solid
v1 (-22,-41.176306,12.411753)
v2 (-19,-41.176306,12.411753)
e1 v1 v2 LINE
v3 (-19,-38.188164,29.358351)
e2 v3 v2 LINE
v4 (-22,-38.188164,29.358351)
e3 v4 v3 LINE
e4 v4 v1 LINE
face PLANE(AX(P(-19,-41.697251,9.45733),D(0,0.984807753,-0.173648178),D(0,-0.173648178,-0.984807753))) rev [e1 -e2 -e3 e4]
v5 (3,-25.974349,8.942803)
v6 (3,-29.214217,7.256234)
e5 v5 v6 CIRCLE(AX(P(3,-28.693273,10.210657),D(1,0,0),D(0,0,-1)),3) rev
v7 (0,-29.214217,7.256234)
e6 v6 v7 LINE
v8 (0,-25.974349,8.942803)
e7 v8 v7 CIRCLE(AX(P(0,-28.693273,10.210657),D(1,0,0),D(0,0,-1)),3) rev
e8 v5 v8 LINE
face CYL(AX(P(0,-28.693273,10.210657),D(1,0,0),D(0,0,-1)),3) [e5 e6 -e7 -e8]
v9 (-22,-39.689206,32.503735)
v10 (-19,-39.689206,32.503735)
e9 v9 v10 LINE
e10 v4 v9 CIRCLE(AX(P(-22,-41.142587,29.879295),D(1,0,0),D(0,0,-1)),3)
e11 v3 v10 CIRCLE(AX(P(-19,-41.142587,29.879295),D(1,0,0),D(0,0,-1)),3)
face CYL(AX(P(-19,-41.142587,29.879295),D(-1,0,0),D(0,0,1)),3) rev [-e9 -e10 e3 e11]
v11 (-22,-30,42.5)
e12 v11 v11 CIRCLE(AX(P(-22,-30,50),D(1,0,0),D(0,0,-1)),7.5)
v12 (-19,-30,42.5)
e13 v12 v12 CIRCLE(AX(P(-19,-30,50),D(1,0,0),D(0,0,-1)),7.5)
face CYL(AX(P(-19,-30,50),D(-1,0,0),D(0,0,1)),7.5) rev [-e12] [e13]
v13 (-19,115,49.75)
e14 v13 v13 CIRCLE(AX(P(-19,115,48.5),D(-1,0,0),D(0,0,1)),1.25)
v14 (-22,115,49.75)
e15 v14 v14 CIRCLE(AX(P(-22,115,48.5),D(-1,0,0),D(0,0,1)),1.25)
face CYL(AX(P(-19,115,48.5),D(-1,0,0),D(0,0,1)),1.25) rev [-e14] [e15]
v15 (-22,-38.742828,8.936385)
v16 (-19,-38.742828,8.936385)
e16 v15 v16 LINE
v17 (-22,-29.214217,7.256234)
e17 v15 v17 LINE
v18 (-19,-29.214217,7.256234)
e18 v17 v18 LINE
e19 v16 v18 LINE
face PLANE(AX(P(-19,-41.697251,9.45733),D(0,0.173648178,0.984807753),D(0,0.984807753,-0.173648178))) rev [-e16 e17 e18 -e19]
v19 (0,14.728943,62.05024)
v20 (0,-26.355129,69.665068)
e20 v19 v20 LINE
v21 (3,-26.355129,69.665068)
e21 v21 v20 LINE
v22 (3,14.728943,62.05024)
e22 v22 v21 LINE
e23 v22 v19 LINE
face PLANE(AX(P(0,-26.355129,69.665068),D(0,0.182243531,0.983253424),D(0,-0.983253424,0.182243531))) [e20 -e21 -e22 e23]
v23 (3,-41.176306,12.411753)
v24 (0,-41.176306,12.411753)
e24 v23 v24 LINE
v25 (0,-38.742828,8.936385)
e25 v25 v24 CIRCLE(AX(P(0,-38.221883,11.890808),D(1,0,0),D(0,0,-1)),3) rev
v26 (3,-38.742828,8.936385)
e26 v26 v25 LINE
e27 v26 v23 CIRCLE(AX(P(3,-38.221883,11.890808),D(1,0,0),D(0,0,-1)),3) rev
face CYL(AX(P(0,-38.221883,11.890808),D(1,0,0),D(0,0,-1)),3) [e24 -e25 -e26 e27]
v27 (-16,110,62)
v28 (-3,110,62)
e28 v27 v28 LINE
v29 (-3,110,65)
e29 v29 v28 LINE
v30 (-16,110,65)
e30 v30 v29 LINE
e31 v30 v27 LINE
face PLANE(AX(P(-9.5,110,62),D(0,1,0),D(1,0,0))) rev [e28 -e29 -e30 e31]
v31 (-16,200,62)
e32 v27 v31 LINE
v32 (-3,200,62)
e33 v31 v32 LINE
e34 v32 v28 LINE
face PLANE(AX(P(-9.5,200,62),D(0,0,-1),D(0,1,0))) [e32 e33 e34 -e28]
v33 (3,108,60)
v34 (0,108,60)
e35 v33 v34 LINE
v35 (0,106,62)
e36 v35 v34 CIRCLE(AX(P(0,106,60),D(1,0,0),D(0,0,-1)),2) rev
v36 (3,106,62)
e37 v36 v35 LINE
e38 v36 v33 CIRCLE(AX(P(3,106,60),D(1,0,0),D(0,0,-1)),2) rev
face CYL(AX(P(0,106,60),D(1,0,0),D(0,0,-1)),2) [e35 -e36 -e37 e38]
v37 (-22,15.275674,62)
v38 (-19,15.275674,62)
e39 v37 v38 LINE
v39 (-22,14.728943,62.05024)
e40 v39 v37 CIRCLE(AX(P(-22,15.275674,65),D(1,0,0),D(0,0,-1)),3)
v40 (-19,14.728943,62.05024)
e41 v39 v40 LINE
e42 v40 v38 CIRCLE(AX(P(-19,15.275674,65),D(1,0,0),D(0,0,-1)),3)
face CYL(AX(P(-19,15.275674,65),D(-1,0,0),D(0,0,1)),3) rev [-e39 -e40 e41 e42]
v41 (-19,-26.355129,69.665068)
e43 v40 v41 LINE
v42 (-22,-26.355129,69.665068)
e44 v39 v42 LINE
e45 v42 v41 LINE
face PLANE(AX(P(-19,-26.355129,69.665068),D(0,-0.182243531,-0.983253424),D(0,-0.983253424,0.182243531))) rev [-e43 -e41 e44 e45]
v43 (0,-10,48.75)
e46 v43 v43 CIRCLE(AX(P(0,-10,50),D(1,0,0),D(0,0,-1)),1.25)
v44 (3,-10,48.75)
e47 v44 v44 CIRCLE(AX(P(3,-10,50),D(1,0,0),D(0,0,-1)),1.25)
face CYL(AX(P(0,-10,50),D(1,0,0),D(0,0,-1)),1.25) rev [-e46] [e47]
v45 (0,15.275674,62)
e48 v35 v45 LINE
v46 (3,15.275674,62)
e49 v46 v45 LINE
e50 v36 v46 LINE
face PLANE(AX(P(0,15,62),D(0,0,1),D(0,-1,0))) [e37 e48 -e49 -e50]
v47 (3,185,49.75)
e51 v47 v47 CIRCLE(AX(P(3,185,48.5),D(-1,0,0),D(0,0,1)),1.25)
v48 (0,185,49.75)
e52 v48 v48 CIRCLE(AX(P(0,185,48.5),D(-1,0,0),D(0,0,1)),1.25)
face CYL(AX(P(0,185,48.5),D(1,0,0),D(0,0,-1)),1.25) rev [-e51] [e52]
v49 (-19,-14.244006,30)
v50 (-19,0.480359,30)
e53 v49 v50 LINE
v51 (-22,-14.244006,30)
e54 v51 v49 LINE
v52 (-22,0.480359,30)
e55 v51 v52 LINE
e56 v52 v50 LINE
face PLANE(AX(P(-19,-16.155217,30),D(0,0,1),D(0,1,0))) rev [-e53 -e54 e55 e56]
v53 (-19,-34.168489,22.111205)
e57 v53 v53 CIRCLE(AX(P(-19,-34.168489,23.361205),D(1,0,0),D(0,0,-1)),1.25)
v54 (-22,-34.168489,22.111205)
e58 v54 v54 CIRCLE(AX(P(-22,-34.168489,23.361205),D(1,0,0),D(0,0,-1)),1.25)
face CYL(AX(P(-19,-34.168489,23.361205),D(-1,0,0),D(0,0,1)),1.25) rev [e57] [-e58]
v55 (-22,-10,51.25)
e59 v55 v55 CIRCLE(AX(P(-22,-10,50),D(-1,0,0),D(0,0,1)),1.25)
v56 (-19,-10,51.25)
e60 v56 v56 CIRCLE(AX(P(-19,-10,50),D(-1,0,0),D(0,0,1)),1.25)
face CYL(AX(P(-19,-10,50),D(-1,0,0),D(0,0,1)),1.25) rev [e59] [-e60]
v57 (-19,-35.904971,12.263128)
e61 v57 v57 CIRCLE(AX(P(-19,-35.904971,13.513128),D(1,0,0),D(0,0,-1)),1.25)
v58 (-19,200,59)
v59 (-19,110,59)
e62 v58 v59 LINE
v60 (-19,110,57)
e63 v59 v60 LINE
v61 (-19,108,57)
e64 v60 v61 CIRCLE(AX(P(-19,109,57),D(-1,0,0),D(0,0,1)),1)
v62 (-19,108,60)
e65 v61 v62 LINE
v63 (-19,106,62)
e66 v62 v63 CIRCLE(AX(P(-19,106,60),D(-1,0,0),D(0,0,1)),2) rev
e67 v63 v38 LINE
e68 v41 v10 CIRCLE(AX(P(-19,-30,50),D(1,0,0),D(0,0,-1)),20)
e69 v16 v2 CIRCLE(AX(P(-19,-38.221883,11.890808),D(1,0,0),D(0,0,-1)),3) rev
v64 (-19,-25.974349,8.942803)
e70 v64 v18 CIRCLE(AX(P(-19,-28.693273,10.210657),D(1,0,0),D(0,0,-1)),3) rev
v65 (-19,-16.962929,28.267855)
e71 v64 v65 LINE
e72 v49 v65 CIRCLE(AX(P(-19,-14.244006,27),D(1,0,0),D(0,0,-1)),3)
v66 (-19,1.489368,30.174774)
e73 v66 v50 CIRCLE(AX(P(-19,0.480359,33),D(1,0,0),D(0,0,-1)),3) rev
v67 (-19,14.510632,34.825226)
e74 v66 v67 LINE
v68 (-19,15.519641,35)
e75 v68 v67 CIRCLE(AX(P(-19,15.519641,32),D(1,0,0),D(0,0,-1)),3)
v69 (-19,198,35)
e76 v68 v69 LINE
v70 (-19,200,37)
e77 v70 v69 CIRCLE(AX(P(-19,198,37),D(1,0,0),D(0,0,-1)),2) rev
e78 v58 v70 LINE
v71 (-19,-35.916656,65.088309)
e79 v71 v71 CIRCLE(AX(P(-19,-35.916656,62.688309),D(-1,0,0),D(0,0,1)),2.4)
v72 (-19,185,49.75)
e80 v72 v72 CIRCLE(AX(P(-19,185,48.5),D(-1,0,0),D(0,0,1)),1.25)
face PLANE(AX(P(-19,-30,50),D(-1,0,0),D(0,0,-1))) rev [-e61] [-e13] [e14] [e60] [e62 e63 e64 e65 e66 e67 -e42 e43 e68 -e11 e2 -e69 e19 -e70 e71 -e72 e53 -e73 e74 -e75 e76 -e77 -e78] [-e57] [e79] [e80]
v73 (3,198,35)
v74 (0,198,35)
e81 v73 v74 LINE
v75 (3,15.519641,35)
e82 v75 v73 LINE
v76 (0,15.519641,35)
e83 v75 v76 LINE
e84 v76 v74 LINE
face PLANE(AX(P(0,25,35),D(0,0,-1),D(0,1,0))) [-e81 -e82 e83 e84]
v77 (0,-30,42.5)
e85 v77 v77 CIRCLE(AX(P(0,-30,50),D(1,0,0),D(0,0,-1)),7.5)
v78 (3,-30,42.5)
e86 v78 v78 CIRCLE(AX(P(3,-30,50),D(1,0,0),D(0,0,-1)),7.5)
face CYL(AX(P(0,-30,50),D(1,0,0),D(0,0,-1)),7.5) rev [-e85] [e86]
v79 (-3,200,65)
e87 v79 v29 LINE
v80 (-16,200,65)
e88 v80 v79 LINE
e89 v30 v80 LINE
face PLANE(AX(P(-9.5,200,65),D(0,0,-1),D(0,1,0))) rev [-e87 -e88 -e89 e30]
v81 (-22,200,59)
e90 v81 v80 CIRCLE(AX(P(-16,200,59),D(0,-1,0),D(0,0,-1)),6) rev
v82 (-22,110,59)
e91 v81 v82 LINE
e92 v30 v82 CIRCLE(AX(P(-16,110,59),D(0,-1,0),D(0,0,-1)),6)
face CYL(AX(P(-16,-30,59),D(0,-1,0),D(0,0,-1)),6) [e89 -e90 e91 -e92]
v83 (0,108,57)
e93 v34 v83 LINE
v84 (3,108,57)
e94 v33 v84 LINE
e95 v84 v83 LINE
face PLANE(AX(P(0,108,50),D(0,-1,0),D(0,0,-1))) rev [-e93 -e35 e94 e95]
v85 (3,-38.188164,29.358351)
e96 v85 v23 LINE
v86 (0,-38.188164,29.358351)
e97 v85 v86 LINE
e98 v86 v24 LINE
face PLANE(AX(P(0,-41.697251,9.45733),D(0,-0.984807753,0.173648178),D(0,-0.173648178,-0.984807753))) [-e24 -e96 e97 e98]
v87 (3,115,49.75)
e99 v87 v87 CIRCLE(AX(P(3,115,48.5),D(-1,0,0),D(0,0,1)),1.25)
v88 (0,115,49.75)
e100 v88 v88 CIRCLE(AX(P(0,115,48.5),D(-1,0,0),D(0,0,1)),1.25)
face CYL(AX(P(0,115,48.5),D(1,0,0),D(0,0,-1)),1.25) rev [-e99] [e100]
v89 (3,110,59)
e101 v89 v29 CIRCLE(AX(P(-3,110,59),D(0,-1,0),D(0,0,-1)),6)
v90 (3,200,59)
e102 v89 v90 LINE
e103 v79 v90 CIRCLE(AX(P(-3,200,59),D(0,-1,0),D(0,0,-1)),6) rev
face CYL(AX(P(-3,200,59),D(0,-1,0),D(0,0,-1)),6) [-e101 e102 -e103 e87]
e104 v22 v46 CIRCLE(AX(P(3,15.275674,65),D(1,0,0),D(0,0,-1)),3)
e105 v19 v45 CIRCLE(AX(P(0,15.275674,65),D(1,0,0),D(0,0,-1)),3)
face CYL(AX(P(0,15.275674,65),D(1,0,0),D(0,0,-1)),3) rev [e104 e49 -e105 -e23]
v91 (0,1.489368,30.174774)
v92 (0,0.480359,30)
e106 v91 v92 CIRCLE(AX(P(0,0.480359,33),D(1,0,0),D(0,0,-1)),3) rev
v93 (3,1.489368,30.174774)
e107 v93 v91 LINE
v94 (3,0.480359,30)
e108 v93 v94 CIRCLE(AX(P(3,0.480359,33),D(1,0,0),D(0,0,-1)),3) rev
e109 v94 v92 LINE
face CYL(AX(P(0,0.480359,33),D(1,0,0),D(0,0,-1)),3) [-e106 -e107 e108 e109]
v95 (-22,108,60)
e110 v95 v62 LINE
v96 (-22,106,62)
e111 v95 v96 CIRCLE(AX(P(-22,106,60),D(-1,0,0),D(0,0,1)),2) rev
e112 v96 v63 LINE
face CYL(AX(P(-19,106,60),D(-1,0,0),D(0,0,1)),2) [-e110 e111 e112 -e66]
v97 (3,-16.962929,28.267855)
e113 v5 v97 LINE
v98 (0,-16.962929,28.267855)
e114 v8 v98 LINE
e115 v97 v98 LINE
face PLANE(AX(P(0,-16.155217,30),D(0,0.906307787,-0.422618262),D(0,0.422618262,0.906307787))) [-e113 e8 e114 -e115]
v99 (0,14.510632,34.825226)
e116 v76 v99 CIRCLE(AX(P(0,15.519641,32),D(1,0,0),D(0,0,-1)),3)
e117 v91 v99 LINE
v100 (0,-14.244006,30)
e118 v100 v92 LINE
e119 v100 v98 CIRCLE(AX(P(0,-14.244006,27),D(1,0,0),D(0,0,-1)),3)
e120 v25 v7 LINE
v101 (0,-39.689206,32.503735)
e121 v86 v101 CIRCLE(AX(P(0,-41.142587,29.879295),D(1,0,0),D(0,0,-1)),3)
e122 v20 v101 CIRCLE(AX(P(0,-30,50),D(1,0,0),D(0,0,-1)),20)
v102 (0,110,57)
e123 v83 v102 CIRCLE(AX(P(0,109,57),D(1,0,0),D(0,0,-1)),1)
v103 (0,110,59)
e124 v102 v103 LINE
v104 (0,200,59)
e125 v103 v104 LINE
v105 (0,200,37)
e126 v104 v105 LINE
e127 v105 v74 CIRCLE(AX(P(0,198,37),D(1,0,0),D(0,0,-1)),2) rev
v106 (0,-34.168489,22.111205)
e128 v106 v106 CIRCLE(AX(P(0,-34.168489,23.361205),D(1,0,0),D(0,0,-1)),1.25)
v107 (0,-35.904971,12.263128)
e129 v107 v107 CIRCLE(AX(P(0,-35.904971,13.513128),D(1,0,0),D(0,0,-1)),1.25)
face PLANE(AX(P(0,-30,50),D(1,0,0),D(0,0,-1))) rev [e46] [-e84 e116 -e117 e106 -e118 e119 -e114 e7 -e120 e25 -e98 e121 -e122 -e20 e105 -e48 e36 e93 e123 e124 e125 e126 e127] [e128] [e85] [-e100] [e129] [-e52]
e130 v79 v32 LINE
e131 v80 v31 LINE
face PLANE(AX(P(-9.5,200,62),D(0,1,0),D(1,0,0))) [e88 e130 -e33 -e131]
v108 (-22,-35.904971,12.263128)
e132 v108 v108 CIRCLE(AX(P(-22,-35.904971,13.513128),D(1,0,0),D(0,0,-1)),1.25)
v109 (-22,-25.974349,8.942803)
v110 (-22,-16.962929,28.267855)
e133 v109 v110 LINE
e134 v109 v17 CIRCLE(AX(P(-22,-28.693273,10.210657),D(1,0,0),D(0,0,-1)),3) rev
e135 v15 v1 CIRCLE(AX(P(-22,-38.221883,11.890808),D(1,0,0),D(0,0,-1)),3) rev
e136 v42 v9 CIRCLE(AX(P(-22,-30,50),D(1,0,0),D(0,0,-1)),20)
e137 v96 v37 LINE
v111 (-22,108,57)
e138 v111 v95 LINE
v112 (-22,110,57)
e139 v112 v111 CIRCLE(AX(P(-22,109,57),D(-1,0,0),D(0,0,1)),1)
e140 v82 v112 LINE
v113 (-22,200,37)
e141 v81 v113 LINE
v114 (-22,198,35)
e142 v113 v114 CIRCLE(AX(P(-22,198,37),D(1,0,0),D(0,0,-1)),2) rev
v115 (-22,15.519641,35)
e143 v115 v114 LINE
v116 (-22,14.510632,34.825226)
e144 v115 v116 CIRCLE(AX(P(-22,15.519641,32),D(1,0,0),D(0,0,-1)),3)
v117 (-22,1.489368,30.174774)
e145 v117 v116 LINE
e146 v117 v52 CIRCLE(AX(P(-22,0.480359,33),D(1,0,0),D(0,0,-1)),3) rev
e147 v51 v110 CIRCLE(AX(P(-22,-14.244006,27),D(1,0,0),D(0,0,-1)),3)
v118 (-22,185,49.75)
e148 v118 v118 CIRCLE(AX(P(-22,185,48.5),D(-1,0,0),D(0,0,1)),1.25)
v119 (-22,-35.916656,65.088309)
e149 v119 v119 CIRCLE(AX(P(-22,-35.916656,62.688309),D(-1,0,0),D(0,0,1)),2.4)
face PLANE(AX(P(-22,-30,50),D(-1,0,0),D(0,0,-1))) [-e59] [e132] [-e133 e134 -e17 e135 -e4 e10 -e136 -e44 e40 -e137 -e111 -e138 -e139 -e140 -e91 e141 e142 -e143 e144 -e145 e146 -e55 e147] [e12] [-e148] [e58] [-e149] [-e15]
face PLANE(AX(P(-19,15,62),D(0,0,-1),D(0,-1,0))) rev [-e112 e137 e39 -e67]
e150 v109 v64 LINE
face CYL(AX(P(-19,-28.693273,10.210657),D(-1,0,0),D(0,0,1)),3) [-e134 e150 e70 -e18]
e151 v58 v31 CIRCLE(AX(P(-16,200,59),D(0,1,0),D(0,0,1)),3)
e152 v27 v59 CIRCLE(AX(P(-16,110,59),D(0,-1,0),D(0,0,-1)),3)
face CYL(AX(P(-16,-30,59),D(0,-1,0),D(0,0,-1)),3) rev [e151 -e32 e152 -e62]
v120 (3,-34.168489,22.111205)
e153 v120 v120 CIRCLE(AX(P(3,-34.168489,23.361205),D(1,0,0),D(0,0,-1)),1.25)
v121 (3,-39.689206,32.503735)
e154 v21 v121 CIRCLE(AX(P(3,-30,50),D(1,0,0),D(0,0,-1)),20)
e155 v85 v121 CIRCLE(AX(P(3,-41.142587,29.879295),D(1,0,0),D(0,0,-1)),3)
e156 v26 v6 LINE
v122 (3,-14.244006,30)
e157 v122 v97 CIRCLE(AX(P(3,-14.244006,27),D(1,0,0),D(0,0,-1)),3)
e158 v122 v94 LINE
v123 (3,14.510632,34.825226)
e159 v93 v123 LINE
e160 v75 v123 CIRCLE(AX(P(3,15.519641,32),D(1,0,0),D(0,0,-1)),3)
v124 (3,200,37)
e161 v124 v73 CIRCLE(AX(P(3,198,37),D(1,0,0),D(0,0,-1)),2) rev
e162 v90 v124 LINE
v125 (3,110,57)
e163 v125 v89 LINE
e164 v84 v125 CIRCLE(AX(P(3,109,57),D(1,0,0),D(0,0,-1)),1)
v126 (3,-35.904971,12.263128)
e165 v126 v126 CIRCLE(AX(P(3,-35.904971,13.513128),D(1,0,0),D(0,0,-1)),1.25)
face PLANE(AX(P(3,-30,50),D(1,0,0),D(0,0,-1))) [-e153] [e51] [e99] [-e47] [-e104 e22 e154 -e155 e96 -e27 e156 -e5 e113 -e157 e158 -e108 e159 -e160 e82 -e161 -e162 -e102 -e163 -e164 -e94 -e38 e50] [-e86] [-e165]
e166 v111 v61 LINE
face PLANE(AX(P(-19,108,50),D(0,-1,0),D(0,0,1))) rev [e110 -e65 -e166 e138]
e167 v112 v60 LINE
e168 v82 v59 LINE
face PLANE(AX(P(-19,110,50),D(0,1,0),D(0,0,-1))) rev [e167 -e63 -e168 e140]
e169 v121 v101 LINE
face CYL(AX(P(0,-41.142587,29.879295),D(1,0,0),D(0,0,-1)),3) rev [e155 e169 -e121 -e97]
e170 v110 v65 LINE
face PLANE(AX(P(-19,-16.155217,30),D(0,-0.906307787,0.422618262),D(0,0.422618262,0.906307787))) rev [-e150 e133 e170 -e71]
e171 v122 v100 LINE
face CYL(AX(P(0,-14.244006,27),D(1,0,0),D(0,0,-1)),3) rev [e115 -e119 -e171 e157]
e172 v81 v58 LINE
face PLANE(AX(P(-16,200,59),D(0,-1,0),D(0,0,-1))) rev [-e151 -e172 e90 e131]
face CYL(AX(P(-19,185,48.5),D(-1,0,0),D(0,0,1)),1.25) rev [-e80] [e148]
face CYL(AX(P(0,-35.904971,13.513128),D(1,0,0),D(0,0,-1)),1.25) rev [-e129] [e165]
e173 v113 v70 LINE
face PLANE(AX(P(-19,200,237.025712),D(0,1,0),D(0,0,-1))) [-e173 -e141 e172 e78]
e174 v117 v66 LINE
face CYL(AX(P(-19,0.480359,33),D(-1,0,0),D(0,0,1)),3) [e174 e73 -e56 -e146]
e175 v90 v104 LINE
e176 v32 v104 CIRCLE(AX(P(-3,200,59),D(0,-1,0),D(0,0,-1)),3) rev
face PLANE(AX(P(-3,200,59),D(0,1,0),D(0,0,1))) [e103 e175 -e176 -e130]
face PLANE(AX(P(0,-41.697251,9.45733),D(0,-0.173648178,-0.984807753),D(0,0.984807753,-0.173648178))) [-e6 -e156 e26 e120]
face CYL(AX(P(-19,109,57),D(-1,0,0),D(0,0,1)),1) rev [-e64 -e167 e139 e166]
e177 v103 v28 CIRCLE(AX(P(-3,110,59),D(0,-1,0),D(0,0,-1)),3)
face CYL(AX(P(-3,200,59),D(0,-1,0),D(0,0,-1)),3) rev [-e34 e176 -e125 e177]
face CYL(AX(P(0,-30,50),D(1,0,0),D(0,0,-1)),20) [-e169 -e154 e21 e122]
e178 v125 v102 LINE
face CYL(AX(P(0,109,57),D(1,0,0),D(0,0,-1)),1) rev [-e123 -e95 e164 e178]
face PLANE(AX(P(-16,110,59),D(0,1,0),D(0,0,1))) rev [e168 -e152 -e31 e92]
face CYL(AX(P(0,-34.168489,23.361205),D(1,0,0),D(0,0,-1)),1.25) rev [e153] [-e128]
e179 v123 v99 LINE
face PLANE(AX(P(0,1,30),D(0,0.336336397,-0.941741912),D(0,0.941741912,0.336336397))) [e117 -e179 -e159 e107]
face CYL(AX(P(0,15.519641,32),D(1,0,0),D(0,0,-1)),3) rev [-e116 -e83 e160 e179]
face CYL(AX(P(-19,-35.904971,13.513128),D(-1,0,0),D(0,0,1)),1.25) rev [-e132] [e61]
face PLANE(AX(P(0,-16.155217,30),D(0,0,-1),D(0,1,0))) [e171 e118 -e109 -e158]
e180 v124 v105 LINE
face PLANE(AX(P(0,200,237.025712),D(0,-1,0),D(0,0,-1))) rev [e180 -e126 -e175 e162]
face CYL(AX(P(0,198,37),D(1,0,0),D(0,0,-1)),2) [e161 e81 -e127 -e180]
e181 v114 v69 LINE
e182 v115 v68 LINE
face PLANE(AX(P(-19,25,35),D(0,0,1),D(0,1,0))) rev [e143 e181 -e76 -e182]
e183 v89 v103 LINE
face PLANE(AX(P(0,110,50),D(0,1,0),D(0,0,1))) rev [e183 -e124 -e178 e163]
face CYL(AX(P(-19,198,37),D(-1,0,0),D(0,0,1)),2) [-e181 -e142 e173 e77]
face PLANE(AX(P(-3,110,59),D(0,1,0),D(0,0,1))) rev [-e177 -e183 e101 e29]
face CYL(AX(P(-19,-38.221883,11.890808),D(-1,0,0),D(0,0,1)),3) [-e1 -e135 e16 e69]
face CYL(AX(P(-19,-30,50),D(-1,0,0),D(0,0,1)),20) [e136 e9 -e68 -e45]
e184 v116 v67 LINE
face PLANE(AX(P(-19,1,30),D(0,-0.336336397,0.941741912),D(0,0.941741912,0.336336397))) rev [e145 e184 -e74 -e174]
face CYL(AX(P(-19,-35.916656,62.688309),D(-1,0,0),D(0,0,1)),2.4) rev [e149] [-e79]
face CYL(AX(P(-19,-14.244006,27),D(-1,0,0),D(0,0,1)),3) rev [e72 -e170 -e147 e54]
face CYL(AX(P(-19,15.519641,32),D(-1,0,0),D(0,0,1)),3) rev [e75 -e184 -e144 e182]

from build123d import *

# Parameters (mm, degrees)
SKETCH1_R              = 7.5
SKETCH1_R_2            = 1.25
BOSS_EXTRUDE1_DEPTH    = 3
FILLET1_R              = 3
SKETCH4_W              = 3
SKETCH4_H              = 175
BOSS_EXTRUDE3_DEPTH    = 27
SKETCH5_R              = 1.25
CUT_EXTRUDE2_DEPTH     = 212.917436753
FILLET4_R              = 2
SKETCH12_W             = 3
SKETCH12_H             = 90
BOSS_EXTRUDE5_DEPTH    = 12.5
CUT_EXTRUDE1_START     = -22
SKETCH2_R              = 2.4
CUT_EXTRUDE1_DEPTH     = 192.365882934
CUT_EXTRUDE8_DEPTH     = 214.365882934
FILLET5_R              = 2
SKETCH51_R             = 1.25
CUT_EXTRUDE9_DEPTH     = 214.365882934
CONVERT_SOLID9_START   = 110
CONVERT_SOLID9_DEPTH   = 90
CONVERT_SOLID9_2_DEPTH = 90


# Read off the part's stored shape, not the designer's step: Convert-Solid9
with BuildPart() as part:
    # Sketch1 → Boss-Extrude1 (new body)
    with BuildSketch(Plane(origin=(0, 0, 0), x_dir=(0, 0, -1), z_dir=(1, 0, 0))):
        with BuildLine():
            Line((-30, -16.155216865), (-30, 1))
            Line((-30, 1), (-35, 15))
            Line((-35, 15), (-35, 25))
            Line((-35, 25), (-62, 25))
            Line((-62, 25), (-62, 15))
            Line((-62, 15), (-69.665068474, -26.355129371))
            ThreePointArc((-69.665068474, -26.355129371), (-55.754353698, -49.154305352), (-31.582037919, -37.796067776))
            Line((-31.582037919, -37.796067776), (-9.457329759, -41.697250765))
            Line((-9.457329759, -41.697250765), (-6.856499335, -26.947208462))
            Line((-6.856499335, -26.947208462), (-30, -16.155216865))
        make_face()
        with Locations((-50, -30)):
            Circle(SKETCH1_R, mode=Mode.SUBTRACT)
        with Locations((-23.361205166, -34.168489335)):
            Circle(SKETCH1_R_2, mode=Mode.SUBTRACT)
        with Locations((-13.513127636, -35.904971111)):
            Circle(SKETCH1_R_2, mode=Mode.SUBTRACT)
    extrude(amount=BOSS_EXTRUDE1_DEPTH)

    # Fillet1
    fillet1_edges = [part.edges().sort_by_distance(p)[0] for p in [
        (1.5, 15, 35),
        (1.5, 1, 30),
        (1.5, -16.155216865, 30),
        (1.5, -26.947208462, 6.856499335),
        (1.5, -41.697250765, 9.457329759),
        (1.5, -37.796067776, 31.582037919),
        (1.5, 15, 62),
    ]]
    fillet(fillet1_edges, radius=FILLET1_R)

    # Sketch4 → Boss-Extrude3 (add)
    with BuildSketch(Plane(origin=(0, 0, 35), x_dir=(-1, 0, 0), z_dir=(0, 0, -1))):
        with Locations((-1.5, 112.5)):
            Rectangle(SKETCH4_W, SKETCH4_H)
    extrude(amount=-BOSS_EXTRUDE3_DEPTH)

    # Sketch5 → Cut-Extrude2 (cut, through all)
    with BuildSketch(Plane.ZY):
        with Locations((48.5, 185)):
            Circle(SKETCH5_R)
        with Locations((48.5, 115)):
            Circle(SKETCH5_R)
    extrude(amount=-CUT_EXTRUDE2_DEPTH, mode=Mode.SUBTRACT)

    # Fillet4
    fillet4_edges = [part.edges().sort_by_distance(p)[0] for p in [
        (1.5, 200, 35),
    ]]
    fillet(fillet4_edges, radius=FILLET4_R)

    # Sketch12 → Boss-Extrude5 (add)
    with BuildSketch(Plane(origin=(3, 0, 0), x_dir=(0, 0, -1), z_dir=(1, 0, 0))):
        with Locations((-63.5, 155)):
            Rectangle(SKETCH12_W, SKETCH12_H)
    extrude(amount=-BOSS_EXTRUDE5_DEPTH)

    # Mirror2: part across plane


with BuildPart() as part_1:
    add(part.part)
    add(part.part.mirror(Plane.ZY.offset(9.5)))

    # Sketch2 → Cut-Extrude1 (cut, through all)
    with BuildSketch(Plane(origin=(3, 0, 0), x_dir=(0, 0, -1), z_dir=(1, 0, 0)).offset(CUT_EXTRUDE1_START)):
        with Locations(Location((-62.688309019, -35.916655664, 0), (0, 0, 180))):
            Circle(SKETCH2_R)
    extrude(amount=-CUT_EXTRUDE1_DEPTH, mode=Mode.SUBTRACT)

    # Sketch50 → Cut-Extrude8 (cut, through all)
    with BuildSketch(Plane(origin=(3, 0, 0), x_dir=(0, 0, -1), z_dir=(1, 0, 0))):
        with BuildLine():
            Line((-62, 110), (-57, 110))
            ThreePointArc((-57, 110), (-56, 109), (-57, 108))
            Line((-57, 108), (-62, 108))
            Line((-62, 108), (-62, 110))
        make_face()
    extrude(amount=-CUT_EXTRUDE8_DEPTH, mode=Mode.SUBTRACT)

    # Fillet5
    fillet5_edges = [part_1.edges().sort_by_distance(p)[0] for p in [
        (1.5, 108, 62),
        (-20.5, 108, 62),
    ]]
    fillet(fillet5_edges, radius=FILLET5_R)

    # Sketch51 → Cut-Extrude9 (cut, through all)
    with BuildSketch(Plane.ZY.offset(22)):
        with Locations((50, -10)):
            Circle(SKETCH51_R)
    extrude(amount=-CUT_EXTRUDE9_DEPTH, mode=Mode.SUBTRACT)

    # Convert-Solid9 outline → Convert-Solid9 (cut)
    with BuildSketch(Plane(origin=(0, 0, 0), x_dir=(1, 0, 0), z_dir=(0, 1, 0)).offset(CONVERT_SOLID9_START)):
        with BuildLine():
            Line((-3, -65), (3, -65))
            Line((3, -65), (3, -59))
            ThreePointArc((3, -59), (1.242640687, -63.242640687), (-3, -65))
        make_face()
        with BuildLine():
            Line((-22, -65), (-16, -65))
            ThreePointArc((-16, -65), (-20.242640687, -63.242640687), (-22, -59))
            Line((-22, -59), (-22, -65))
        make_face()
    extrude(amount=CONVERT_SOLID9_DEPTH, mode=Mode.SUBTRACT)

    # Convert-Solid9 2 outline → Convert-Solid9 2 (add)
    with BuildSketch(Plane(origin=(0, 0, 0), x_dir=(1, 0, 0), z_dir=(0, 1, 0)).offset(CONVERT_SOLID9_START)):
        with BuildLine():
            Line((0, -62), (0, -59))
            ThreePointArc((0, -59), (-0.878679656, -61.121320344), (-3, -62))
            Line((-3, -62), (0, -62))
        make_face()
        with BuildLine():
            Line((-19, -62), (-16, -62))
            ThreePointArc((-16, -62), (-18.121320344, -61.121320344), (-19, -59))
            Line((-19, -59), (-19, -62))
        make_face()
    extrude(amount=CONVERT_SOLID9_2_DEPTH)


solid = part_1.part
